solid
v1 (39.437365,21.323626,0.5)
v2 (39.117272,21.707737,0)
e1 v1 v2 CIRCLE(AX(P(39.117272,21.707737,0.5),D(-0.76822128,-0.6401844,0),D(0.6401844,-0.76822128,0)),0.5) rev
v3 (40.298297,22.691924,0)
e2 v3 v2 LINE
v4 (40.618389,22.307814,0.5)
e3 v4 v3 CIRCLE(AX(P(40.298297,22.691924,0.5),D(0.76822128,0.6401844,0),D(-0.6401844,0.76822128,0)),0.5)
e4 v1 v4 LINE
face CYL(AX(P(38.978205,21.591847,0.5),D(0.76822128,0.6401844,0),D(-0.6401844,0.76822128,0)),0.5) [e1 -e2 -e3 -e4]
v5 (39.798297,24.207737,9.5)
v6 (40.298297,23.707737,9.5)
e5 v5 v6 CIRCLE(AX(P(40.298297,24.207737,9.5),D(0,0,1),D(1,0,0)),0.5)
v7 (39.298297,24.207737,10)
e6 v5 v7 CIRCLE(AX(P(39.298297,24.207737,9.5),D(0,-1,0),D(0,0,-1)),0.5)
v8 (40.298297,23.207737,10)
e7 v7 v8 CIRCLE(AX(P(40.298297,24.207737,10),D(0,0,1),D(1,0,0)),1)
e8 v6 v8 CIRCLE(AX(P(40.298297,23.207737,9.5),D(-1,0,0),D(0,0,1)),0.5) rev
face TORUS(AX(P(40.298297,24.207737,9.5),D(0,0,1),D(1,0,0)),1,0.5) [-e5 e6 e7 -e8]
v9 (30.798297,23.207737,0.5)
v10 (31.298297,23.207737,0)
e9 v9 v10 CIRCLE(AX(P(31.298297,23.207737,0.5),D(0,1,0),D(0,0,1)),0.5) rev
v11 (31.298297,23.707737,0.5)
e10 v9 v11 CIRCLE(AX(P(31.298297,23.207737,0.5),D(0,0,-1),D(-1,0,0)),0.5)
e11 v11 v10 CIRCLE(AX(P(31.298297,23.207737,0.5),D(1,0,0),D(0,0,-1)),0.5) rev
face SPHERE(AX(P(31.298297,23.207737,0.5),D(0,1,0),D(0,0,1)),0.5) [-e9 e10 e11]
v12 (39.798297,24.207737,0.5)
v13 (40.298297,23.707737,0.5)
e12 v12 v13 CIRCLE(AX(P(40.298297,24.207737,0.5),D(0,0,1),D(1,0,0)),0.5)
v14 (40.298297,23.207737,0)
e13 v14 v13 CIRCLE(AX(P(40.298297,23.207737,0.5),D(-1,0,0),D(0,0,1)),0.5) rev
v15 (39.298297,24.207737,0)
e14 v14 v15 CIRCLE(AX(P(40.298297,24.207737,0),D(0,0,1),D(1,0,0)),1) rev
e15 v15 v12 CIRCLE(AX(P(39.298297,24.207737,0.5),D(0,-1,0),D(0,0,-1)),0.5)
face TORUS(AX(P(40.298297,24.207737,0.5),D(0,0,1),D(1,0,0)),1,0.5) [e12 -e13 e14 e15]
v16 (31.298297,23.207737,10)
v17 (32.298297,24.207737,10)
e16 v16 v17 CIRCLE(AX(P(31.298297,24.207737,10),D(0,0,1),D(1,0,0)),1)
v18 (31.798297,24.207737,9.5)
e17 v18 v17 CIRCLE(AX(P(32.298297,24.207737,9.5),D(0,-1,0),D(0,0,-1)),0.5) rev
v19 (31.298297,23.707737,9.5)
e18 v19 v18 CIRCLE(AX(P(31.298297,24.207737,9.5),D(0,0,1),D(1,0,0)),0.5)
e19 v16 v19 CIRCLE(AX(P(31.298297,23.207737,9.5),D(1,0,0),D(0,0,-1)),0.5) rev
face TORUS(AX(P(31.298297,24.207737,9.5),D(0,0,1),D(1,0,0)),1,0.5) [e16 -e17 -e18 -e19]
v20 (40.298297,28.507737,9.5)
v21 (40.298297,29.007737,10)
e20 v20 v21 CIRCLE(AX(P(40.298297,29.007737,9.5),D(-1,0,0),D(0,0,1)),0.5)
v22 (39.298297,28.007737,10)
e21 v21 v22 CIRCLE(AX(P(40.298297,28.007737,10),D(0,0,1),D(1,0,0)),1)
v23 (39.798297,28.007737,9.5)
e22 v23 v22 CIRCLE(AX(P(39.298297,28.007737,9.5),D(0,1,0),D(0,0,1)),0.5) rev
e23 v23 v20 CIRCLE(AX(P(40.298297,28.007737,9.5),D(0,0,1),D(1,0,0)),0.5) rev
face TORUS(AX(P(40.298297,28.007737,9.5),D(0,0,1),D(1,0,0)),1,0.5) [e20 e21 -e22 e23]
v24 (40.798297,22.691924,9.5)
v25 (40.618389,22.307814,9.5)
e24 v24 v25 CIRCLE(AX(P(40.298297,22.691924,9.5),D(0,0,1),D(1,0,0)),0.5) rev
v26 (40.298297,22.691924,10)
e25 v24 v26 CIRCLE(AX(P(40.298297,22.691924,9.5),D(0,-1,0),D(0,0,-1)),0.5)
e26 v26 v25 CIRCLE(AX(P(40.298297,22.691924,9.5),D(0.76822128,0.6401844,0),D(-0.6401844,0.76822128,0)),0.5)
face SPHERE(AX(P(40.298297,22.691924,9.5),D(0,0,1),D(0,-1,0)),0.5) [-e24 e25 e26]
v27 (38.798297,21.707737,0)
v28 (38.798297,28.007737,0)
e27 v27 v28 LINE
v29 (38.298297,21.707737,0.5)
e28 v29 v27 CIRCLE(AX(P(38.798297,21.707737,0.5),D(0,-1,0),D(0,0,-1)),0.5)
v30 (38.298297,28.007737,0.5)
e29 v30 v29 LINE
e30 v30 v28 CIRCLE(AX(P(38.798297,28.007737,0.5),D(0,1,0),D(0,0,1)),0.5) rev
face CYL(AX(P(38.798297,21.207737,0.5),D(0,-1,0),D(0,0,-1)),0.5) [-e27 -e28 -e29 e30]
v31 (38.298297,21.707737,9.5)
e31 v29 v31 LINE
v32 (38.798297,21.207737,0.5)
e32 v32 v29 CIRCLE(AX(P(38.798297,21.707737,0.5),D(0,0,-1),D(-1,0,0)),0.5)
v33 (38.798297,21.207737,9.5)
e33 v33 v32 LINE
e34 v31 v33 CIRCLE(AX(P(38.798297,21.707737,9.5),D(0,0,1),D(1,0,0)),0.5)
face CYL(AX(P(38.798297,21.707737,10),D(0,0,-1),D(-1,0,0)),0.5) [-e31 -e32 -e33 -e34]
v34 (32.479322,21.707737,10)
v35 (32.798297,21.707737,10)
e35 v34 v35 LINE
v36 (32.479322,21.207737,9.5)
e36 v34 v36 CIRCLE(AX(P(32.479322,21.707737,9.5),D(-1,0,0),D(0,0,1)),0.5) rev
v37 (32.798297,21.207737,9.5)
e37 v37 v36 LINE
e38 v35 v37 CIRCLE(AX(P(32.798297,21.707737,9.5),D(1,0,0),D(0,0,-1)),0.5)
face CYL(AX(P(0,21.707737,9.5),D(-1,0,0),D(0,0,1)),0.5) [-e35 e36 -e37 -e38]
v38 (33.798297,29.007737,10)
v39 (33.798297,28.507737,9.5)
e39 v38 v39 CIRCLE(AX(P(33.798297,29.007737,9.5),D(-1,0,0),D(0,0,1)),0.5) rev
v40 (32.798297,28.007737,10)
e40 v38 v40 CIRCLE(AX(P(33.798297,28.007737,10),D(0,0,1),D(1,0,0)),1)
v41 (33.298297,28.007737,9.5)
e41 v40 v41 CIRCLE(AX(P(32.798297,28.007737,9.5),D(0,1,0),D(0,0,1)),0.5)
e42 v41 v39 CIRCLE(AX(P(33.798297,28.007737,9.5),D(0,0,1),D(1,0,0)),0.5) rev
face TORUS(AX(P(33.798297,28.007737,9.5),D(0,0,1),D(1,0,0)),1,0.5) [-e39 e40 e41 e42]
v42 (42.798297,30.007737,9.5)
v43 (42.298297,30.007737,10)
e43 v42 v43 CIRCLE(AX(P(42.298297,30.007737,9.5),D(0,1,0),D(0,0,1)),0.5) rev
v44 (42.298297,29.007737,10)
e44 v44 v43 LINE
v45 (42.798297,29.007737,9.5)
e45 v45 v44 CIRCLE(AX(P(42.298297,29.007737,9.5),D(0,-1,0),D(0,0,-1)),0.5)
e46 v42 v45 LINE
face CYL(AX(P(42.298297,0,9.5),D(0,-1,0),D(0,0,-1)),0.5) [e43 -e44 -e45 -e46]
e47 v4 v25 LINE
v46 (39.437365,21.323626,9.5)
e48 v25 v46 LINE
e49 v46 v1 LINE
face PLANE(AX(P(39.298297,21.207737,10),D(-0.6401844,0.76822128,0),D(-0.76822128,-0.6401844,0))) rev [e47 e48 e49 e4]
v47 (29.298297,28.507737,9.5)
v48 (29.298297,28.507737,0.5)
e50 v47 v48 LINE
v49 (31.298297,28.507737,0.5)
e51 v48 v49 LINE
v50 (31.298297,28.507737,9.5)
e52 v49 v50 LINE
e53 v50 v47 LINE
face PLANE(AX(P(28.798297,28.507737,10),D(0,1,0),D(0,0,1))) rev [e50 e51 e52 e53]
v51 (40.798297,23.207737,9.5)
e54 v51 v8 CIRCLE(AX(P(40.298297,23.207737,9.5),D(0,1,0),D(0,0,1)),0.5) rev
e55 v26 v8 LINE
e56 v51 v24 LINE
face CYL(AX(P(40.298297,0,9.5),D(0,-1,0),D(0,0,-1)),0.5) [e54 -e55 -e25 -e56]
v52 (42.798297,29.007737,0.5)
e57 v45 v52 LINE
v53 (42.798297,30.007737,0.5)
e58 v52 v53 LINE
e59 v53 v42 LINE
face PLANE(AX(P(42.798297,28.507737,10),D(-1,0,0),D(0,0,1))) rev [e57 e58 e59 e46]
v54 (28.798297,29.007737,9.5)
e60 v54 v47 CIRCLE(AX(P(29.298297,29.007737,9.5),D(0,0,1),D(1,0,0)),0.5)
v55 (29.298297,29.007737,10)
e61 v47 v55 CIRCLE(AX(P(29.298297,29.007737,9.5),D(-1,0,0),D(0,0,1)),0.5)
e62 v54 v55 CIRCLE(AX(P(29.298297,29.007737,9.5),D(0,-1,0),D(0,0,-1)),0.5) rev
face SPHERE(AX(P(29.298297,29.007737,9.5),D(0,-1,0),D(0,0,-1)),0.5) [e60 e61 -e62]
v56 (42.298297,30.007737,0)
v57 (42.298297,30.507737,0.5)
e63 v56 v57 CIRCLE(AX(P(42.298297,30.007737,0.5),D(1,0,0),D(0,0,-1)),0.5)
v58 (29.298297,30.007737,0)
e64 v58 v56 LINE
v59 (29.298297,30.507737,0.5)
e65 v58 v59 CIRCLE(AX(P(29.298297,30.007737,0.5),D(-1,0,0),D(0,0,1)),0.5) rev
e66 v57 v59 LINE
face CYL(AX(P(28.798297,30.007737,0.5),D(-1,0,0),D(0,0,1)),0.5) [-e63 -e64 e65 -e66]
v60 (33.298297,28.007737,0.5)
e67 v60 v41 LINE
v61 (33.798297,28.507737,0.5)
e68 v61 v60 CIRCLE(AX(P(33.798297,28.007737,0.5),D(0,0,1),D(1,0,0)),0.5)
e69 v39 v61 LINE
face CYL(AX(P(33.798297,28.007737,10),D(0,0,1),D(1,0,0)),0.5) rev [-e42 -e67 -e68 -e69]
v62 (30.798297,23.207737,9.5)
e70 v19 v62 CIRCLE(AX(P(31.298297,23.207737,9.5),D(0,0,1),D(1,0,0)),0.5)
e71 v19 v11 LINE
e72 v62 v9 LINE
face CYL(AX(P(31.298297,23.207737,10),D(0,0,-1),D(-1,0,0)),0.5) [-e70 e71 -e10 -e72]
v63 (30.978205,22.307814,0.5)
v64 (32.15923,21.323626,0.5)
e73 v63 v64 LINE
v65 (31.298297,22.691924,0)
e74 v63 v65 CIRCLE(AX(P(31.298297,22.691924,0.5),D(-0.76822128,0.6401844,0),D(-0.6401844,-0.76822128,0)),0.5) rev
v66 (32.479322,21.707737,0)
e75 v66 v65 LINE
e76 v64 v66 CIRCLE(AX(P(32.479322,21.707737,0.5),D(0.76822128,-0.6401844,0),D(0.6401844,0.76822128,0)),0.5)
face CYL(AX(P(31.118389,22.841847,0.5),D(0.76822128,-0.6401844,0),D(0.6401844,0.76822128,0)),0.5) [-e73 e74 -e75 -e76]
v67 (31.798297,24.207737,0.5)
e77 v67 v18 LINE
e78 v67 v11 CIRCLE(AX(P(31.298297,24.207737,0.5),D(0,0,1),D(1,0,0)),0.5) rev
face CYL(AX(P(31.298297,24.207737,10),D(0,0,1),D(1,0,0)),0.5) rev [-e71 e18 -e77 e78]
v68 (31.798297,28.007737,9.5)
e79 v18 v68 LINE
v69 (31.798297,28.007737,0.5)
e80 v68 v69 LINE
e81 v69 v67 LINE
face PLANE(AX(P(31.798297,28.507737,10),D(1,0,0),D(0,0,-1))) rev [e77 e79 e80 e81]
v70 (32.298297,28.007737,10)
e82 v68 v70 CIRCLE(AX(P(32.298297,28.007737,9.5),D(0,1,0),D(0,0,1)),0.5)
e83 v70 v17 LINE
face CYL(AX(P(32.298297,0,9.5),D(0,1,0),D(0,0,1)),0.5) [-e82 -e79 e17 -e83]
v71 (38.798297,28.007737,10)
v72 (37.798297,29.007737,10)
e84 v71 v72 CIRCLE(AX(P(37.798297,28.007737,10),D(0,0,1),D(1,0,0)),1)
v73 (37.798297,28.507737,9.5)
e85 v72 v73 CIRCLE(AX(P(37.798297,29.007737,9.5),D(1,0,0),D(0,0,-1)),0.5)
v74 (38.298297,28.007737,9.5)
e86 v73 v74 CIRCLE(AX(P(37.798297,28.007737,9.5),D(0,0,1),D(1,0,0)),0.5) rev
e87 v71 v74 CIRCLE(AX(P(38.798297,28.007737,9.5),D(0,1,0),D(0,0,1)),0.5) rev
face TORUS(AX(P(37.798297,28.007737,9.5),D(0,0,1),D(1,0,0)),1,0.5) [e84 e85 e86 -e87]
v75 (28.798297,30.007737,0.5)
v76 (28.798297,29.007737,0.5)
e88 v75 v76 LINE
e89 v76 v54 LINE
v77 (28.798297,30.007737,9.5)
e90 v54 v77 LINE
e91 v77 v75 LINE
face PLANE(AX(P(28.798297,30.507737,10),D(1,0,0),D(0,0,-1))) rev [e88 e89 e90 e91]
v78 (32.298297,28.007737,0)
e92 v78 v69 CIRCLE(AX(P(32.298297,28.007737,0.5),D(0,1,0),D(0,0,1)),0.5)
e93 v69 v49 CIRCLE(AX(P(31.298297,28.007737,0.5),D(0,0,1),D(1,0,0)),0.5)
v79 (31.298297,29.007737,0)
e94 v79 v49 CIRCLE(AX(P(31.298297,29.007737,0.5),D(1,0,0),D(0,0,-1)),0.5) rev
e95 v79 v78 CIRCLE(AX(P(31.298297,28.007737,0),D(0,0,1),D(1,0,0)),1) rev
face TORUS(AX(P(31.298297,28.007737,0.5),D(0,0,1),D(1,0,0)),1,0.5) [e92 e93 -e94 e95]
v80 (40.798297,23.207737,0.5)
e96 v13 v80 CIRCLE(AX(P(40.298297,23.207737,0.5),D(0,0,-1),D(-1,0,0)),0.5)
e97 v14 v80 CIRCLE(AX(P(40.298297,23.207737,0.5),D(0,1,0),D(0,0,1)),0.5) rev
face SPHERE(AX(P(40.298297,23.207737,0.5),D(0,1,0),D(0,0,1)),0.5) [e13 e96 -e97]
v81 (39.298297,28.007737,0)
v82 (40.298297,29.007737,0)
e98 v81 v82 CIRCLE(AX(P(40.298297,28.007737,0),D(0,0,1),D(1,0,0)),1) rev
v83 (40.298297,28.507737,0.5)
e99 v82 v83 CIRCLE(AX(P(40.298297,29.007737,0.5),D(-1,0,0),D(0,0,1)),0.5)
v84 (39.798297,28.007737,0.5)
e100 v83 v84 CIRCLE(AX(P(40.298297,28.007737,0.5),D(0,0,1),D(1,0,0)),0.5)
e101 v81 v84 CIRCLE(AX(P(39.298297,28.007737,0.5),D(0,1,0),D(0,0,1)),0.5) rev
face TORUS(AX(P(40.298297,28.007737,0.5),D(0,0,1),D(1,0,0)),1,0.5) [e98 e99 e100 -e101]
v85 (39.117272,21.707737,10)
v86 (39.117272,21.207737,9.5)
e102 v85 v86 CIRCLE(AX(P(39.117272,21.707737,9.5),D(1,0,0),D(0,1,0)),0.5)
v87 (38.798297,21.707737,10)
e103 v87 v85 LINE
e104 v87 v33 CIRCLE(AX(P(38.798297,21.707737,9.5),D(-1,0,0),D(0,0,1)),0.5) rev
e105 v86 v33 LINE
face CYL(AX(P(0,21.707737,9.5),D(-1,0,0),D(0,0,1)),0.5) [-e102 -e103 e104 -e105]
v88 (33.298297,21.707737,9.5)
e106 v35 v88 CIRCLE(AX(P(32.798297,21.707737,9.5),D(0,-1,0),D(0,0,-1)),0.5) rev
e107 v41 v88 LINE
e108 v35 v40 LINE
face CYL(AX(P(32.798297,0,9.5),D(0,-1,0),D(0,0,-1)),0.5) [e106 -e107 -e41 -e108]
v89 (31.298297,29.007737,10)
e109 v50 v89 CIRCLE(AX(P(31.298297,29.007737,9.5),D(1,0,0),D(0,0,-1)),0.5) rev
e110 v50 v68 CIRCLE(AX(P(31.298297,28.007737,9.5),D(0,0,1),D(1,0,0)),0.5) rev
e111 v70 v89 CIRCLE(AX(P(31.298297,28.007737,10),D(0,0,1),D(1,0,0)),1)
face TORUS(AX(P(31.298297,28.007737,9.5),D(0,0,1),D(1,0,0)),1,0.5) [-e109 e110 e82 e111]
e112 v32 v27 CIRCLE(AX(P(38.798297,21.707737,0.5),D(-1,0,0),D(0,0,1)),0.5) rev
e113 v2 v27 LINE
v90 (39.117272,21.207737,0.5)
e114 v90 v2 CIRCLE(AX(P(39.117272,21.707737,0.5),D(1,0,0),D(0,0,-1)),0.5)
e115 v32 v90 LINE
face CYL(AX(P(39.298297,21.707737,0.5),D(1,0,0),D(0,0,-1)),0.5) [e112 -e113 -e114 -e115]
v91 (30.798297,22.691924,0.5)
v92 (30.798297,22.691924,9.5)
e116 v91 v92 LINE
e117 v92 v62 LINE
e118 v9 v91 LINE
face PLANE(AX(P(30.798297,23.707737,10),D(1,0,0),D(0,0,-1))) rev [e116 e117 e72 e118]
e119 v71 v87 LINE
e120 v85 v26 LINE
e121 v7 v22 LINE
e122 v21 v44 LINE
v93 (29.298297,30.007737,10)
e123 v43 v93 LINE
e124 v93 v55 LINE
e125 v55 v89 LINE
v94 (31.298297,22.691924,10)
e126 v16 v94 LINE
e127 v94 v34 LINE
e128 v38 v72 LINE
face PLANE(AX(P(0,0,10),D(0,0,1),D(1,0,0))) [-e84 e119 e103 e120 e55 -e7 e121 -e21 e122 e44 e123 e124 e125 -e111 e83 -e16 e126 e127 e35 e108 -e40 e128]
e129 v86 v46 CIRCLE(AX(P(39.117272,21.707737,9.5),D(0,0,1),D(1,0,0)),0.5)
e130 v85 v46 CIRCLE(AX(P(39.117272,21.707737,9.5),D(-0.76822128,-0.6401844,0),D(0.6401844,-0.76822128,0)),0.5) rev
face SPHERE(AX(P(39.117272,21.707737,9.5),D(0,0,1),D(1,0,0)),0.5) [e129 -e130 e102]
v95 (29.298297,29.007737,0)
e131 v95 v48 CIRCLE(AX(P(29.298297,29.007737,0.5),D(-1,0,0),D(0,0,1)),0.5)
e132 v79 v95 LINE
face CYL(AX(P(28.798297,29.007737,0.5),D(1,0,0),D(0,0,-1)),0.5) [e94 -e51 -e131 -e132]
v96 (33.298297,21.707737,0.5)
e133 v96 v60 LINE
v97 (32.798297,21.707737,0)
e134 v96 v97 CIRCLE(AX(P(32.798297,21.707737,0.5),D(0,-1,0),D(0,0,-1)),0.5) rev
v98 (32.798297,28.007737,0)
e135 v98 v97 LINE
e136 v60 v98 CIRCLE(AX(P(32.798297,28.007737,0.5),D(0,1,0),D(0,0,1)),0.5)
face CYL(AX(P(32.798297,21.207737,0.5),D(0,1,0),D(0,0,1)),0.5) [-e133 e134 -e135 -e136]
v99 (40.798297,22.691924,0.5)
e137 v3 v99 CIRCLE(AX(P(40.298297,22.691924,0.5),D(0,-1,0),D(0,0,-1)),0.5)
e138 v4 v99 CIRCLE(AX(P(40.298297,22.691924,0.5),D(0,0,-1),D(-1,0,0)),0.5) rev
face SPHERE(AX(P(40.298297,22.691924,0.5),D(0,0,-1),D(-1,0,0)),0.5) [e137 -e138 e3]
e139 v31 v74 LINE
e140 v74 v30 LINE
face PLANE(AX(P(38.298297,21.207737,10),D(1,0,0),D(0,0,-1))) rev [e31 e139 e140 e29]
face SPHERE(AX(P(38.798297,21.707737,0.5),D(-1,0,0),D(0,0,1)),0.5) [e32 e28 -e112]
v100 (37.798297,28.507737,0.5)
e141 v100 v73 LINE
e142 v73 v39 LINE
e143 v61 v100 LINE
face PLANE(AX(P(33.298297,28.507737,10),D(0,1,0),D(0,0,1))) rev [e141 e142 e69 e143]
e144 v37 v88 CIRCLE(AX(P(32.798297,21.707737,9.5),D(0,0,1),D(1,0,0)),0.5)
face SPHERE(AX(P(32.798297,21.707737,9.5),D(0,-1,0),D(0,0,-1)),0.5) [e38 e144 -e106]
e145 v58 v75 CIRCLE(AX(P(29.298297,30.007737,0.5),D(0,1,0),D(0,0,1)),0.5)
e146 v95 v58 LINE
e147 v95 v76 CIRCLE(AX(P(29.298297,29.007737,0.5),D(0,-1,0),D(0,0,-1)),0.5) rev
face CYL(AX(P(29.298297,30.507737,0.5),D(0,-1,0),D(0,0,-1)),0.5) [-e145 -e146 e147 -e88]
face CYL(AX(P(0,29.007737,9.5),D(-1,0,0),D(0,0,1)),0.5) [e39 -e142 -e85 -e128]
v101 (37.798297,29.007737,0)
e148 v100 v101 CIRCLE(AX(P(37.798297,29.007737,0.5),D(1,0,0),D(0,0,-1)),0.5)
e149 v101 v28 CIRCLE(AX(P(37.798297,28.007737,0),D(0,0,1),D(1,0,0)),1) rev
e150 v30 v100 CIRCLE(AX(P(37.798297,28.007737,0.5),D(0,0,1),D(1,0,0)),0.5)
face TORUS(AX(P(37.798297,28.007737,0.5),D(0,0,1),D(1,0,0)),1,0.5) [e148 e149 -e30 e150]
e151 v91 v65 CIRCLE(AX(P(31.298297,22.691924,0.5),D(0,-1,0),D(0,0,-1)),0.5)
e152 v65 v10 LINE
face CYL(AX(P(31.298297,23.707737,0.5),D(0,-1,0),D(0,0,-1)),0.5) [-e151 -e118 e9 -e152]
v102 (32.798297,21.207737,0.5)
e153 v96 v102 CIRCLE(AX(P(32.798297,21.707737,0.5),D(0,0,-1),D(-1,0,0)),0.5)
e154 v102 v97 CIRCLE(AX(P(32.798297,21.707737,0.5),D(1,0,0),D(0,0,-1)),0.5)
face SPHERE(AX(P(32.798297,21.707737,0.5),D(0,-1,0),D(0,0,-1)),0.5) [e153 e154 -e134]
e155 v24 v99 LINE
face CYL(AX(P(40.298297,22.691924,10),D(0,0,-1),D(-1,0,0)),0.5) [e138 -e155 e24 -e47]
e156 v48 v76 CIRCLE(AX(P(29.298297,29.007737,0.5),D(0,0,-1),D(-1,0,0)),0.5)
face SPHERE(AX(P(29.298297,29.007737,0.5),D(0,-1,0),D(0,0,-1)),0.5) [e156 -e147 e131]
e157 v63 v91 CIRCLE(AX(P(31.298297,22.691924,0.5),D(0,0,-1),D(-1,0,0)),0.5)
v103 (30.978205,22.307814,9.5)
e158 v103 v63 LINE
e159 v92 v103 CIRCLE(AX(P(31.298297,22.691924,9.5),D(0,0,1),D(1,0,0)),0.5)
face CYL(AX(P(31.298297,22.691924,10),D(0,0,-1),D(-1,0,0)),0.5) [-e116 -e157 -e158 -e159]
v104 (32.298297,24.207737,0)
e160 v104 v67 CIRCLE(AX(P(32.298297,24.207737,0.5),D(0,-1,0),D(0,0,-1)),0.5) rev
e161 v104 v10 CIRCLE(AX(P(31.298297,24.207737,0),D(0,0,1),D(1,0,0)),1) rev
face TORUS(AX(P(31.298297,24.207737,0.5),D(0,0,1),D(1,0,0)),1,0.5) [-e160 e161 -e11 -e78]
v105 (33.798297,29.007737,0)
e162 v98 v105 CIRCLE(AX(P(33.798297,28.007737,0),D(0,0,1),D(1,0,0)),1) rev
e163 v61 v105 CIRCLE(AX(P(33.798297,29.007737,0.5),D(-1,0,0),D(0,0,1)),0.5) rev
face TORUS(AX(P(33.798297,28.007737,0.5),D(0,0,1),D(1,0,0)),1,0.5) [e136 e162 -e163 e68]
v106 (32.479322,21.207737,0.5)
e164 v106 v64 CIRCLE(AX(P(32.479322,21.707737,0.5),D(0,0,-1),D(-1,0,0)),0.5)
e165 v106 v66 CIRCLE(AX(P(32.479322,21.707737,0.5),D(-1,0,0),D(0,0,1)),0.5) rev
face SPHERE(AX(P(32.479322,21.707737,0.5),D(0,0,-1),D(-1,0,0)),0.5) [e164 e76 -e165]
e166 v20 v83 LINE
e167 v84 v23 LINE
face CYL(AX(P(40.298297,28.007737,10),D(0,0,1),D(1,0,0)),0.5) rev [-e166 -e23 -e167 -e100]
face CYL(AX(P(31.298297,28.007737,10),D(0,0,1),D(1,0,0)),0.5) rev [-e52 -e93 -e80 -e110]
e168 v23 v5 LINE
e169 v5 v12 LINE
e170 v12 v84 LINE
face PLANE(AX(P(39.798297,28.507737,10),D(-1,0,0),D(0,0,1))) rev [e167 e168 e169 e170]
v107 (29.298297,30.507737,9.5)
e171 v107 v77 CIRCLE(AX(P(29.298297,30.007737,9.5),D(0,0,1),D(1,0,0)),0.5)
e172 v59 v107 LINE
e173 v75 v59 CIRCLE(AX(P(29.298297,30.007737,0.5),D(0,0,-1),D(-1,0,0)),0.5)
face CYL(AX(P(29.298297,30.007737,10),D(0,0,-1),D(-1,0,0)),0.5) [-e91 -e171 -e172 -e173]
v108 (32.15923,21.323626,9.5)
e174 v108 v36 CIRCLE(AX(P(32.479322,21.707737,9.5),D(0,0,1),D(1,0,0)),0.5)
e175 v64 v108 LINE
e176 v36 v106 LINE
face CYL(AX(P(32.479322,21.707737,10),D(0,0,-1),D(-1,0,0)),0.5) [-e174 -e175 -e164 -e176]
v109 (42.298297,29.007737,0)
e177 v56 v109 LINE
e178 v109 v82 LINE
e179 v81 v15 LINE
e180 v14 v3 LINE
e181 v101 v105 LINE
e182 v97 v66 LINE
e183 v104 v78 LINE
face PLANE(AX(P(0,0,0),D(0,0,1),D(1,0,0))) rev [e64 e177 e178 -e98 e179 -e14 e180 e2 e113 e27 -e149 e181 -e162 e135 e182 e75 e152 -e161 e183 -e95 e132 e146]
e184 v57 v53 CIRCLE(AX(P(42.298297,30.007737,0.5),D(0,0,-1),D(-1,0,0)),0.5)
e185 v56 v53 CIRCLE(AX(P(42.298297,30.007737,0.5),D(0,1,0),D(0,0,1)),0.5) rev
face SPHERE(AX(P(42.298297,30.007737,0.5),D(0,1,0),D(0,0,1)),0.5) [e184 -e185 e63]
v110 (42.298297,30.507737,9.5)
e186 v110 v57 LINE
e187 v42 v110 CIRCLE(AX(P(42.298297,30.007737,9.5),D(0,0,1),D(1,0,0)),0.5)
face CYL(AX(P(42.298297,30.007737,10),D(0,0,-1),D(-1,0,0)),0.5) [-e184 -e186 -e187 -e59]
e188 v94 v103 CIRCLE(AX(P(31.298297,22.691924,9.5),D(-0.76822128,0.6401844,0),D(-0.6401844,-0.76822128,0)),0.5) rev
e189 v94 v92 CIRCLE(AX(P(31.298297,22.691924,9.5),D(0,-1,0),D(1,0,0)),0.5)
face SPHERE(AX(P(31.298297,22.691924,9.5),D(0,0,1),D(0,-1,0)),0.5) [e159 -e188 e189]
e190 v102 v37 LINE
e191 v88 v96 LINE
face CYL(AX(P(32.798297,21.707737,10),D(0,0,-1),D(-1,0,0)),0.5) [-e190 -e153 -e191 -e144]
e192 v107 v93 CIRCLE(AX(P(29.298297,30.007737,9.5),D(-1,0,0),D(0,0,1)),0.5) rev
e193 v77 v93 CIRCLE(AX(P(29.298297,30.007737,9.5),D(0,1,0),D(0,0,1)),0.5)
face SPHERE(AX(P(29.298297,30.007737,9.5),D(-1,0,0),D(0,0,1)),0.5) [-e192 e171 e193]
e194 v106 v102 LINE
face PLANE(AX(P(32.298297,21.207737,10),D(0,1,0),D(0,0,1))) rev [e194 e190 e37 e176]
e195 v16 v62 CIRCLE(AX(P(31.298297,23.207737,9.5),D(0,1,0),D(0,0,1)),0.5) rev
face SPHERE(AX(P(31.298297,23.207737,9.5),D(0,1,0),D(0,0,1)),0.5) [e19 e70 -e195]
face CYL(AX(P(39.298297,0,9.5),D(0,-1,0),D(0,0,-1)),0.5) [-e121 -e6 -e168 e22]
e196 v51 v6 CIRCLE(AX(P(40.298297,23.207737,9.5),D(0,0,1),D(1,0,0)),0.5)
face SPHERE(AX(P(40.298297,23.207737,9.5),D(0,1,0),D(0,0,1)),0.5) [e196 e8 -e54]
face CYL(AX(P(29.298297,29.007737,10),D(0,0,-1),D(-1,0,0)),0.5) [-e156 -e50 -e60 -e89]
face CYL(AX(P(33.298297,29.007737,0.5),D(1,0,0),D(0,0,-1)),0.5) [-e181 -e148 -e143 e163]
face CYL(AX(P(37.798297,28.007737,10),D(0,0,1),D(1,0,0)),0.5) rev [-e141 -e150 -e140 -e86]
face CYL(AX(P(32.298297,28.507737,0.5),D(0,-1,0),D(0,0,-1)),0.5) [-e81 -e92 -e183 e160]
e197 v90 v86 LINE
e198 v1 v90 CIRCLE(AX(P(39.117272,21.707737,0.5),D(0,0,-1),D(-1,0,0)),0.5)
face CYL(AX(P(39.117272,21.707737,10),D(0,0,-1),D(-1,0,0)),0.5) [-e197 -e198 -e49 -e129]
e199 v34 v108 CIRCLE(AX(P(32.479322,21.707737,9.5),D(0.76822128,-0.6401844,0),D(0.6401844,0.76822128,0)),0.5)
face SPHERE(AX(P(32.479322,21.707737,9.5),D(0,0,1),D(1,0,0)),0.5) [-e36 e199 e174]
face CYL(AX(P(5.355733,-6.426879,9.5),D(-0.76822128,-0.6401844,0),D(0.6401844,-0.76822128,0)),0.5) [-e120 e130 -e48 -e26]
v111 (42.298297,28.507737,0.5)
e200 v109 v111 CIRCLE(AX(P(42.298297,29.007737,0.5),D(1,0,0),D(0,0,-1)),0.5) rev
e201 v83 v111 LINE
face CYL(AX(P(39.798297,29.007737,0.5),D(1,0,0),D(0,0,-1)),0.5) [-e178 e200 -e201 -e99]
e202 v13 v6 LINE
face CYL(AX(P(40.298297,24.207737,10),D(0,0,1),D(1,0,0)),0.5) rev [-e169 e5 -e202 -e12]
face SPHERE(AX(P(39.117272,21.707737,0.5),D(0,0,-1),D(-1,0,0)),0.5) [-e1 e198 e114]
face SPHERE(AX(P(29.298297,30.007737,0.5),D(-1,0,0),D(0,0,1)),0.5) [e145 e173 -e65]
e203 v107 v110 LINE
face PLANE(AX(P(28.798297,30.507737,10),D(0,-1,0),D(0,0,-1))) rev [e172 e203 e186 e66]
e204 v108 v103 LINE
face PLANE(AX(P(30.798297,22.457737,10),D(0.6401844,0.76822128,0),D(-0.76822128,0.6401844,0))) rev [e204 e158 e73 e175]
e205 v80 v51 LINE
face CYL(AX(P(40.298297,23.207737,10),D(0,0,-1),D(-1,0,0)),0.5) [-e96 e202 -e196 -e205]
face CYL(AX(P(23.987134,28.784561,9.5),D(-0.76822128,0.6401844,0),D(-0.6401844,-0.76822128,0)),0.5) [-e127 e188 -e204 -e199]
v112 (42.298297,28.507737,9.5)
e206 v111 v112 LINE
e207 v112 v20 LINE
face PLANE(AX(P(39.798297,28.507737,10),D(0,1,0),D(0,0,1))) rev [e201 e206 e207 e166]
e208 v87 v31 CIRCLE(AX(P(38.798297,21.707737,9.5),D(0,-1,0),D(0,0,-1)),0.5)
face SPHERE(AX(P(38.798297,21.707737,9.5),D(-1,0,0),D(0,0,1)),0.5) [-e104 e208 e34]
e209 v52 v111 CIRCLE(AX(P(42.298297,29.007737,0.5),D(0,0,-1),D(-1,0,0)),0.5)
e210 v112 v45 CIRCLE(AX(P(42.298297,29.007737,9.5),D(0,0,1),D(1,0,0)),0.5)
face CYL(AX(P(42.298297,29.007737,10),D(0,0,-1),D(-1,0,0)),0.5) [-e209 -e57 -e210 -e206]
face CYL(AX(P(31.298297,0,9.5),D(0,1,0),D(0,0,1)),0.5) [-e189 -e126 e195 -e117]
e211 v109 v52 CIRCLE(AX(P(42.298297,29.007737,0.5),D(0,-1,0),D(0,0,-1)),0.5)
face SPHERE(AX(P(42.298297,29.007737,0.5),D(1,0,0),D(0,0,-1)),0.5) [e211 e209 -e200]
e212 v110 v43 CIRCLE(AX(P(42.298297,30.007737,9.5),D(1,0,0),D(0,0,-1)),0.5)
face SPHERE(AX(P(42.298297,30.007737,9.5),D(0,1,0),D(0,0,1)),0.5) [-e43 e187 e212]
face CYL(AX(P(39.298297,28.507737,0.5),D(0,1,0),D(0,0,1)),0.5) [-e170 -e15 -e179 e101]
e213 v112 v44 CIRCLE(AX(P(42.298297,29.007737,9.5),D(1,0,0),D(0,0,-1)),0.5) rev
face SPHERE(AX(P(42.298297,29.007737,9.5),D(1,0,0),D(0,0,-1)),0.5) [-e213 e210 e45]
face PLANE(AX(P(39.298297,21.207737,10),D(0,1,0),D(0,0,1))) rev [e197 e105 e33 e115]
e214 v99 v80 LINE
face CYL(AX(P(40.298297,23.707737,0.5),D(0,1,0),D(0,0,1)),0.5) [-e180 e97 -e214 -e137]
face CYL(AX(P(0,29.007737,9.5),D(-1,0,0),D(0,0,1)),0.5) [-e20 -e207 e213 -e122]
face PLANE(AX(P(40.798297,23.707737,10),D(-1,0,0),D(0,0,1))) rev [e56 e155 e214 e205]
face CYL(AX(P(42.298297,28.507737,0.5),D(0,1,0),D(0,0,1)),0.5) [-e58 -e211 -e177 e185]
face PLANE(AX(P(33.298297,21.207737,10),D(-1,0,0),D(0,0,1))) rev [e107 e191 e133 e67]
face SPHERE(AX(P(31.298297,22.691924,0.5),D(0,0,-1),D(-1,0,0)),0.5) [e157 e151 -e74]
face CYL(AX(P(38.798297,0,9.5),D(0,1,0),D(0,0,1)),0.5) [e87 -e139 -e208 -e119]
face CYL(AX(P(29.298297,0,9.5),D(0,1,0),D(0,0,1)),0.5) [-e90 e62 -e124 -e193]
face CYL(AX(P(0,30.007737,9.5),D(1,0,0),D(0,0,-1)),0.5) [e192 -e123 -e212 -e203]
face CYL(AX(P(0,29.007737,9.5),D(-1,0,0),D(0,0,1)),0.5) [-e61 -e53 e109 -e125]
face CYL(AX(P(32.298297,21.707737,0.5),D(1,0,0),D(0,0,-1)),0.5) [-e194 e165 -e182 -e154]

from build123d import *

# Parameters (mm, degrees)
EXTRUDE_1_DEPTH = 10
FILLET_1_R      = 0.5


with BuildPart() as part:
    # 草图1 → 凸台-拉伸1 (new body)
    with BuildSketch(Plane.XY):
        Polygon((28.798297288, 30.507736781), (42.798297288, 30.507736781), (42.798297288, 28.507736781), (39.798297288, 28.507736781), (39.798297288, 23.707736781), (40.798297288, 23.707736781), (40.798297288, 22.457736781), (39.298297288, 21.207736781), (38.298297288, 21.207736781), (38.298297288, 28.507736781), (33.298297288, 28.507736781), (33.298297288, 21.207736781), (32.298297288, 21.207736781), (30.798297288, 22.457736781), (30.798297288, 23.707736781), (31.798297288, 23.707736781), (31.798297288, 28.507736781), (28.798297288, 28.507736781), align=None)
    extrude(amount=EXTRUDE_1_DEPTH)

    # 圆角1
    fillet_1_edges = [part.edges().sort_by_distance(p)[0] for p in [
        (31.798297288, 26.107736781, 10),
        (31.298297288, 23.707736781, 10),
        (35.798297288, 30.507736781, 0),
        (42.798297288, 29.507736781, 0),
        (41.298297288, 28.507736781, 0),
        (39.798297288, 26.107736781, 0),
        (40.298297288, 23.707736781, 0),
        (40.798297288, 23.082736781, 0),
        (40.048297288, 21.832736781, 0),
        (38.798297288, 21.207736781, 0),
        (38.298297288, 24.857736781, 0),
        (30.798297288, 23.082736781, 10),
        (35.798297288, 28.507736781, 0),
        (33.298297288, 24.857736781, 0),
        (32.798297288, 21.207736781, 0),
        (31.548297288, 21.832736781, 0),
        (30.798297288, 23.082736781, 0),
        (31.298297288, 23.707736781, 0),
        (31.798297288, 26.107736781, 0),
        (30.298297288, 28.507736781, 0),
        (28.798297288, 29.507736781, 0),
        (31.548297288, 21.832736781, 10),
        (32.798297288, 21.207736781, 10),
        (28.798297288, 30.507736781, 5),
        (42.798297288, 30.507736781, 5),
        (42.798297288, 28.507736781, 5),
        (39.798297288, 28.507736781, 5),
        (39.798297288, 23.707736781, 5),
        (40.798297288, 23.707736781, 5),
        (40.798297288, 22.457736781, 5),
        (39.298297288, 21.207736781, 5),
        (38.298297288, 21.207736781, 5),
        (38.298297288, 28.507736781, 5),
        (33.298297288, 28.507736781, 5),
        (33.298297288, 21.207736781, 5),
        (32.298297288, 21.207736781, 5),
        (30.798297288, 22.457736781, 5),
        (30.798297288, 23.707736781, 5),
        (31.798297288, 23.707736781, 5),
        (31.798297288, 28.507736781, 5),
        (28.798297288, 28.507736781, 5),
        (33.298297288, 24.857736781, 10),
        (35.798297288, 28.507736781, 10),
        (38.298297288, 24.857736781, 10),
        (38.798297288, 21.207736781, 10),
        (40.048297288, 21.832736781, 10),
        (28.798297288, 29.507736781, 10),
        (40.798297288, 23.082736781, 10),
        (40.298297288, 23.707736781, 10),
        (39.798297288, 26.107736781, 10),
        (41.298297288, 28.507736781, 10),
        (42.798297288, 29.507736781, 10),
        (35.798297288, 30.507736781, 10),
        (30.298297288, 28.507736781, 10),
    ]]
    fillet(fillet_1_edges, radius=FILLET_1_R - 0.0001)  # a hair under: the kernel refuses the full size


solid = part.part
